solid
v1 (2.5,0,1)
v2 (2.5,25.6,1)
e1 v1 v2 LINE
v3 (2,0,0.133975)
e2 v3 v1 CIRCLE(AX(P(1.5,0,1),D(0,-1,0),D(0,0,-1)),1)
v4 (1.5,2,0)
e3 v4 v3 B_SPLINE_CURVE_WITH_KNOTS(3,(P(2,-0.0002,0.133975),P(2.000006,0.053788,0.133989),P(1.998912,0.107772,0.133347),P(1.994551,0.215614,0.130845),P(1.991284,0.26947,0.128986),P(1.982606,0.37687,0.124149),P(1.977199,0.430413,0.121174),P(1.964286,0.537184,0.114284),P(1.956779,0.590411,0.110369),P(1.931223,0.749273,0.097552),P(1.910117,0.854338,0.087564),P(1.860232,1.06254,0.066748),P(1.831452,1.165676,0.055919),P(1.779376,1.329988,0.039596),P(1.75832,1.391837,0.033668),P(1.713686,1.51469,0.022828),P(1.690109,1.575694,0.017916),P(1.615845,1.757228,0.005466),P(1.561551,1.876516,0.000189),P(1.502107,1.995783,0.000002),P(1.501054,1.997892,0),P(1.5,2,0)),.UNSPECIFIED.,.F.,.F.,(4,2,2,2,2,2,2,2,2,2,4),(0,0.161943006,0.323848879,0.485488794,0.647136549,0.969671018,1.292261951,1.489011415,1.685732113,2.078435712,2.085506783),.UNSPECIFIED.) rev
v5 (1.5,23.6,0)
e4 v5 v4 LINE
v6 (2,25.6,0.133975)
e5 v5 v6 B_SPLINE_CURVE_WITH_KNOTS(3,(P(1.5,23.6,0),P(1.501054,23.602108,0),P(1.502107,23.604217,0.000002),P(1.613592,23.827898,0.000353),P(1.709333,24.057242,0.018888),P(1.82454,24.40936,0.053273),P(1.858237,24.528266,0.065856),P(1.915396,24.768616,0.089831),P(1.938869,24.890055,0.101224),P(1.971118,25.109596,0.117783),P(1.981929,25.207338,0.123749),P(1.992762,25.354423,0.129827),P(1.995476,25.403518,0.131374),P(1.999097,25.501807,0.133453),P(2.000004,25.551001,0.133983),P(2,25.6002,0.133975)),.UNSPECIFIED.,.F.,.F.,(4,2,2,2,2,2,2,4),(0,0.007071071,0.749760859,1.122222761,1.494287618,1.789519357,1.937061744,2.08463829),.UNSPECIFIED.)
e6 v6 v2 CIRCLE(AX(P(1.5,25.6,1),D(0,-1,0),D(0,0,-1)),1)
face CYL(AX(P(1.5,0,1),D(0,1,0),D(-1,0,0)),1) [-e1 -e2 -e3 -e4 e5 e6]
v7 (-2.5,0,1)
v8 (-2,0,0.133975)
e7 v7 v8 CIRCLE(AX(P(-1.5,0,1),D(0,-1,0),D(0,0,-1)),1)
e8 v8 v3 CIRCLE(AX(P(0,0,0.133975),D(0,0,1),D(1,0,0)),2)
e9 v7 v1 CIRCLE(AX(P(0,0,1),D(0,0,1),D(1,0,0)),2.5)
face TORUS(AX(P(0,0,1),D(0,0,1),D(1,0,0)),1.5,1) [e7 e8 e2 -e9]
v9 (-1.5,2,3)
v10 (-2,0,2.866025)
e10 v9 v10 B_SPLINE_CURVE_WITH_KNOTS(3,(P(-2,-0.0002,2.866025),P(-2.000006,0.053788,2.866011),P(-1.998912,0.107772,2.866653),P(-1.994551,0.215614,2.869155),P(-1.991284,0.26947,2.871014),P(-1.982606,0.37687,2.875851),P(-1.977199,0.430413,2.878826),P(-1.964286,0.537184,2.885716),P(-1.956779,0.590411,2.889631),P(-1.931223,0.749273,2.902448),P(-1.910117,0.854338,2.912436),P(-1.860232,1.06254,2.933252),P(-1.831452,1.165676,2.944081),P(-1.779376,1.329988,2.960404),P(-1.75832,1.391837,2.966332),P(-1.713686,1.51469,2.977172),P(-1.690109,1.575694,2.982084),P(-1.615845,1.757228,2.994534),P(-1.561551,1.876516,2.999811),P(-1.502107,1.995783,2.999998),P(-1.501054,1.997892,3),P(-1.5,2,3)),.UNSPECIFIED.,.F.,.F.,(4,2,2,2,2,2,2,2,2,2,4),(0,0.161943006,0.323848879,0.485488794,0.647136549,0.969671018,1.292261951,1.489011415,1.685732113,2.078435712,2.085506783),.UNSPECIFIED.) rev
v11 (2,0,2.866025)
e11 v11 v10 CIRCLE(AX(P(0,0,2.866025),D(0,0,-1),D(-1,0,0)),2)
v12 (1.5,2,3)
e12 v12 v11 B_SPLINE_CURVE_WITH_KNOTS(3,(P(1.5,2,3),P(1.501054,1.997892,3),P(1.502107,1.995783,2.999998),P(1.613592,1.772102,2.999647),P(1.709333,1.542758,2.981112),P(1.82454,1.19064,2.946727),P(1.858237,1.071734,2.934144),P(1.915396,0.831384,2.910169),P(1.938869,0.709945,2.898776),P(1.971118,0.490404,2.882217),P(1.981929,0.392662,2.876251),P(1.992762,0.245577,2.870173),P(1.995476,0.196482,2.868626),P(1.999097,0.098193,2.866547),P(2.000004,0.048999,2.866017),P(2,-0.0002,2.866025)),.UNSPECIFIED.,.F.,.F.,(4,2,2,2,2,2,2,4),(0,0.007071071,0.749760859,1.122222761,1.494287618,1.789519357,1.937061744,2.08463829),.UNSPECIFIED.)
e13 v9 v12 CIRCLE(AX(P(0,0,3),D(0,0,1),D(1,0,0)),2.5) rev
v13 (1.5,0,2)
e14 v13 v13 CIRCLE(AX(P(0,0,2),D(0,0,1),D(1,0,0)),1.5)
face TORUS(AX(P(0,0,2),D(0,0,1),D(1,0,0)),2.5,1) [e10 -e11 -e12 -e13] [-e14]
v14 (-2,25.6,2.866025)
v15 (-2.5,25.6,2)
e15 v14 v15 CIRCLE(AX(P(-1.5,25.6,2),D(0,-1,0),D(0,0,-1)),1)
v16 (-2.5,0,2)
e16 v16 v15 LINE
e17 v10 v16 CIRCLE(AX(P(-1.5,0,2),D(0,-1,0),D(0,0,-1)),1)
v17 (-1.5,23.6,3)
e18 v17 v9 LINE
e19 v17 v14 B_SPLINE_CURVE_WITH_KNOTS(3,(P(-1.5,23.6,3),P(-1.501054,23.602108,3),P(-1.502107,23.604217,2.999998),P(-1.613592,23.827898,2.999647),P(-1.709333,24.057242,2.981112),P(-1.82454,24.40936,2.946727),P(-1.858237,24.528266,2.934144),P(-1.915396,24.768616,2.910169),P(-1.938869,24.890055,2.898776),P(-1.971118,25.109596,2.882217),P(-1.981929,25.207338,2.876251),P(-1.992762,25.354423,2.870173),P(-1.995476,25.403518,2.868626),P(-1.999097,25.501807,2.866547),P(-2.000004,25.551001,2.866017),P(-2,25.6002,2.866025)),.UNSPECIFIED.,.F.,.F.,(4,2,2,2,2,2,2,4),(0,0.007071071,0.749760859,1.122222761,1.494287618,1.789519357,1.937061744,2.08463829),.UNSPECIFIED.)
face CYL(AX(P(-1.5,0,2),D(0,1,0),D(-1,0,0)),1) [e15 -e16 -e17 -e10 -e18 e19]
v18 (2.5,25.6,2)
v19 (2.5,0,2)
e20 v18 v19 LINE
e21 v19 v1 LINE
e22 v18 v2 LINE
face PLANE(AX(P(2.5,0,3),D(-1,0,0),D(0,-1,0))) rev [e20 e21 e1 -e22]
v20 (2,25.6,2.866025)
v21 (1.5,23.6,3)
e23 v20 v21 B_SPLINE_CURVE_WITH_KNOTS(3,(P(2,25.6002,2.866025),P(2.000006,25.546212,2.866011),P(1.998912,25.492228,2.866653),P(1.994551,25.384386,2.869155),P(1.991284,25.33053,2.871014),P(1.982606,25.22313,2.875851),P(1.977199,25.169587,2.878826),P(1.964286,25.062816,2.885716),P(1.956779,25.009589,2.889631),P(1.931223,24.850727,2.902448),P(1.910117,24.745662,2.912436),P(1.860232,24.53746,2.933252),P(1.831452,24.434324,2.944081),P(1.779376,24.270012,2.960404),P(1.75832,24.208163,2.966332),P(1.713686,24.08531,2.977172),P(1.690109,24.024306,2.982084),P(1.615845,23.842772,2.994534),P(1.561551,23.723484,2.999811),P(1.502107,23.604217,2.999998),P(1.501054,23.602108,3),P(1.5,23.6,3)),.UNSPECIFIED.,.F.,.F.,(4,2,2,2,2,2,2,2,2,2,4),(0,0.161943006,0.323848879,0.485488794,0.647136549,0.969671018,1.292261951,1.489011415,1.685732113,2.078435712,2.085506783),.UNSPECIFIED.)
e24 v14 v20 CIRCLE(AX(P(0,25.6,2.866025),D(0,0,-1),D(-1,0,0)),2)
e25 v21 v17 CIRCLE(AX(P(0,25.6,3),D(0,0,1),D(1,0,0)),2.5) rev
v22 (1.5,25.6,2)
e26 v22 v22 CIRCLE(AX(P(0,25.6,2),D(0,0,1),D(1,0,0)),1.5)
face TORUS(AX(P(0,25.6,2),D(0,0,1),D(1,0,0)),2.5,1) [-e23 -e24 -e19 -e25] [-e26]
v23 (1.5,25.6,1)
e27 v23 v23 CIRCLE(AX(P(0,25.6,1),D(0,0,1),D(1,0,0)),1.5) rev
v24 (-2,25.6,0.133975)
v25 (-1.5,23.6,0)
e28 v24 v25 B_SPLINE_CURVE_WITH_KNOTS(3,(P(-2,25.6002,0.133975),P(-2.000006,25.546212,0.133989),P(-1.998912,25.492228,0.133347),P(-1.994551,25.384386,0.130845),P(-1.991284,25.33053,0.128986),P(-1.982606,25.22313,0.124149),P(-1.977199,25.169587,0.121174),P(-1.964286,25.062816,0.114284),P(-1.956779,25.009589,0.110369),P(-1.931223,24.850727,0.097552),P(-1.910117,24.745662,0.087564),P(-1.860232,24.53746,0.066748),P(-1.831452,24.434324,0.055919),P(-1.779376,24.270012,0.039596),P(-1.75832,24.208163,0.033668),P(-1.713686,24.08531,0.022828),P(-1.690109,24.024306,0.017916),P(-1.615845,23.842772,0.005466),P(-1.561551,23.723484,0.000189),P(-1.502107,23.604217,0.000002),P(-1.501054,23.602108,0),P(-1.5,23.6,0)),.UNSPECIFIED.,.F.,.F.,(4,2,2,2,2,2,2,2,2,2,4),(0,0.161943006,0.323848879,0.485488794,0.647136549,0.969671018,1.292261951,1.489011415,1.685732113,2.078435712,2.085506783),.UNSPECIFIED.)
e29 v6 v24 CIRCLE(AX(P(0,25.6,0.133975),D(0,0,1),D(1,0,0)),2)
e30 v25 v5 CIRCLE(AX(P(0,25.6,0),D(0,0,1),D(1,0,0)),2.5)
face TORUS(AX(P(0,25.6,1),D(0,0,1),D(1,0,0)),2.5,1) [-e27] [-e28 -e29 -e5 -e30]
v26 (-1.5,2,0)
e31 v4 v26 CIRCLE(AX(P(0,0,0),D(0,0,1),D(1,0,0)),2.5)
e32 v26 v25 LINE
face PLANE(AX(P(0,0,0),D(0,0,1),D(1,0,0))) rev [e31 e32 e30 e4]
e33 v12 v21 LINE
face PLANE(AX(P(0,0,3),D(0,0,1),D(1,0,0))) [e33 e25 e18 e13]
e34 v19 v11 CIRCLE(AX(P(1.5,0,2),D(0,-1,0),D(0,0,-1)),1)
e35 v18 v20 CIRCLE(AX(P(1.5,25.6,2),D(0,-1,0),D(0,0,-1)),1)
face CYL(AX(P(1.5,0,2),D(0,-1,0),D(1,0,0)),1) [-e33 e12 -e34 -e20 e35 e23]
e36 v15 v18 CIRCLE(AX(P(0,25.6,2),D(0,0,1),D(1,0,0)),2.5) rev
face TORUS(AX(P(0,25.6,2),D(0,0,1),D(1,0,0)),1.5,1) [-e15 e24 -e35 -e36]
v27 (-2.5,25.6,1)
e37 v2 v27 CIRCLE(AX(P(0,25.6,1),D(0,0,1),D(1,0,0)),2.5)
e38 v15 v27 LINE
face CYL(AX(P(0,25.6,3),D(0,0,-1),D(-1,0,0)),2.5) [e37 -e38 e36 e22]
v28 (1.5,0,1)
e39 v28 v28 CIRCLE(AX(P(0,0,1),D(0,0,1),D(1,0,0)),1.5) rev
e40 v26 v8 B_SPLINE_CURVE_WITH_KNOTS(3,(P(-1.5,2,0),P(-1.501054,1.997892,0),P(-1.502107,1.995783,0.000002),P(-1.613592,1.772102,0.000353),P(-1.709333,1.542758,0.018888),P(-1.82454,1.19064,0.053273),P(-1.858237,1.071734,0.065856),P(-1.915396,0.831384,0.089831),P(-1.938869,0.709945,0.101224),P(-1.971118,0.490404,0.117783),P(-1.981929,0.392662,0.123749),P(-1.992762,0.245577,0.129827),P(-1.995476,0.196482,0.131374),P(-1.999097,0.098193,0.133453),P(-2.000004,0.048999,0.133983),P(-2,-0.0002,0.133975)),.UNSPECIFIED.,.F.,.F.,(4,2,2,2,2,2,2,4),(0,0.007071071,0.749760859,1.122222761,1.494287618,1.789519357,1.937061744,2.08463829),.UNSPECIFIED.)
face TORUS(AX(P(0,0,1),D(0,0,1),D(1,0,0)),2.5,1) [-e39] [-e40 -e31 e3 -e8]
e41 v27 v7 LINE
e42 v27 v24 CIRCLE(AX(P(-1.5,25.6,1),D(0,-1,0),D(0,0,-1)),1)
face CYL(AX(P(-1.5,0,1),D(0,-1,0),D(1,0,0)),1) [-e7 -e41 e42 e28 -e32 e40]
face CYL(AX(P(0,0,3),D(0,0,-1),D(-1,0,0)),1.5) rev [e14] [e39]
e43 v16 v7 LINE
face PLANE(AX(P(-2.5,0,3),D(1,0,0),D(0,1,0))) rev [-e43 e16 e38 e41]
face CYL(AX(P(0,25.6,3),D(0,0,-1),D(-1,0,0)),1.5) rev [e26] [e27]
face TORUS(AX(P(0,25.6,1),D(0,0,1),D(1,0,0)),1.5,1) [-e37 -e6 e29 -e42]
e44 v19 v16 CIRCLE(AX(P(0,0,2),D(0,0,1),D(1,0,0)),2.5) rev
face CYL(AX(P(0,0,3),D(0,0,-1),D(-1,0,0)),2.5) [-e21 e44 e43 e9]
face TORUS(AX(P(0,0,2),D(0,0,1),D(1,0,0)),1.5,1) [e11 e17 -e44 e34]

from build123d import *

# Parameters (mm, degrees)
SKETCH1_R           = 1.5
BOSS_EXTRUDE1_DEPTH = 3
FILLET2_R           = 1


with BuildPart() as part:
    # Sketch1 → Boss-Extrude1 (new body)
    with BuildSketch(Plane.XY):
        with BuildLine():
            Line((-2.5, 0), (-2.5, 25.6))
            ThreePointArc((-2.5, 25.6), (0, 28.1), (2.5, 25.6))
            Line((2.5, 25.6), (2.5, 0))
            ThreePointArc((2.5, 0), (0, -2.5), (-2.5, 0))
        make_face()
        with Locations((0, 25.6)):
            Circle(SKETCH1_R, mode=Mode.SUBTRACT)
        Circle(SKETCH1_R, mode=Mode.SUBTRACT)
    extrude(amount=BOSS_EXTRUDE1_DEPTH)

    # Fillet2
    # the kernel refuses this fillet: 1 mm, written as the material it takes off along each edge
    with BuildSketch(Plane(origin=(0, 0, 3), x_dir=(1, 0, 0), z_dir=(0, 1, 0))) as fillet2_piece_1:
        with BuildLine():
            CenterArc((2.5 - FILLET2_R, FILLET2_R), FILLET2_R, 270, 90)
            Line((2.5 - FILLET2_R, 0), (2.5, 0))
            Line((2.5, 0), (2.5, FILLET2_R))
        make_face()
    revolve(axis=Axis((0, 0, 3), (0, 0, -1)), revolution_arc=180, mode=Mode.SUBTRACT)
    with BuildSketch(Plane(origin=(0, 0, 0), x_dir=(1, 0, 0), z_dir=(0, 1, 0))) as fillet2_piece_2:
        with BuildLine():
            CenterArc((2.5 - FILLET2_R, -FILLET2_R), FILLET2_R, 0, 90)
            Line((2.5 - FILLET2_R, 0), (2.5, 0))
            Line((2.5, 0), (2.5, -FILLET2_R))
        make_face()
    revolve(axis=Axis((0, 0, 0), (0, 0, -1)), revolution_arc=180, mode=Mode.SUBTRACT)
    with BuildSketch(Plane(origin=(2.5, 25.6, 3), x_dir=(0, 0, -1), z_dir=(0, -1, 0)), Plane(origin=(-2.5, 0, 3), x_dir=(0, 0, -1), z_dir=(0, 1, 0))) as fillet2_piece_3:
        with BuildLine():
            CenterArc((FILLET2_R, -FILLET2_R), FILLET2_R, 90, 90)
            Line((0, -FILLET2_R), (0, 0))
            Line((0, 0), (FILLET2_R, 0))
        make_face()
    extrude(amount=25.6, mode=Mode.SUBTRACT)
    with BuildSketch(Plane(origin=(2.5, 25.6, 0), x_dir=(0, 0, 1), z_dir=(0, -1, 0)), Plane(origin=(-2.5, 0, 0), x_dir=(0, 0, 1), z_dir=(0, 1, 0))) as fillet2_piece_4:
        with BuildLine():
            CenterArc((FILLET2_R, FILLET2_R), FILLET2_R, 180, 90)
            Line((0, FILLET2_R), (0, 0))
            Line((0, 0), (FILLET2_R, 0))
        make_face()
    extrude(amount=25.6, mode=Mode.SUBTRACT)
    with BuildSketch(Plane(origin=(0, 25.6, 3), x_dir=(-1, 0, 0), z_dir=(0, -1, 0))) as fillet2_piece_5:
        with BuildLine():
            CenterArc((2.5 - FILLET2_R, FILLET2_R), FILLET2_R, 270, 90)
            Line((2.5 - FILLET2_R, 0), (2.5, 0))
            Line((2.5, 0), (2.5, FILLET2_R))
        make_face()
    revolve(axis=Axis((0, 25.6, 3), (0, 0, -1)), revolution_arc=180, mode=Mode.SUBTRACT)
    with BuildSketch(Plane(origin=(0, 25.6, 0), x_dir=(-1, 0, 0), z_dir=(0, -1, 0))) as fillet2_piece_6:
        with BuildLine():
            CenterArc((2.5 - FILLET2_R, -FILLET2_R), FILLET2_R, 0, 90)
            Line((2.5 - FILLET2_R, 0), (2.5, 0))
            Line((2.5, 0), (2.5, -FILLET2_R))
        make_face()
    revolve(axis=Axis((0, 25.6, 0), (0, 0, -1)), revolution_arc=180, mode=Mode.SUBTRACT)
    with BuildSketch(Plane(origin=(0, 25.6, 0), x_dir=(1, 0, 0), z_dir=(0, -1, 0))) as fillet2_piece_7:
        with BuildLine():
            CenterArc((1.5 + FILLET2_R, FILLET2_R), FILLET2_R, 180, 90)
            Line((1.5 + FILLET2_R, 0), (1.5, 0))
            Line((1.5, 0), (1.5, FILLET2_R))
        make_face()
    revolve(axis=Axis((0, 25.6, 0), (0, 0, 1)), mode=Mode.SUBTRACT)
    with BuildSketch(Plane(origin=(0, 25.6, 3), x_dir=(1, 0, 0), z_dir=(0, -1, 0))) as fillet2_piece_8:
        with BuildLine():
            CenterArc((1.5 + FILLET2_R, -FILLET2_R), FILLET2_R, 90, 90)
            Line((1.5 + FILLET2_R, 0), (1.5, 0))
            Line((1.5, 0), (1.5, -FILLET2_R))
        make_face()
    revolve(axis=Axis((0, 25.6, 3), (0, 0, 1)), mode=Mode.SUBTRACT)
    with BuildSketch(Plane(origin=(0, 0, 0), x_dir=(1, 0, 0), z_dir=(0, -1, 0))) as fillet2_piece_9:
        with BuildLine():
            CenterArc((1.5 + FILLET2_R, FILLET2_R), FILLET2_R, 180, 90)
            Line((1.5 + FILLET2_R, 0), (1.5, 0))
            Line((1.5, 0), (1.5, FILLET2_R))
        make_face()
    revolve(axis=Axis((0, 0, 0), (0, 0, 1)), mode=Mode.SUBTRACT)
    with BuildSketch(Plane(origin=(0, 0, 3), x_dir=(1, 0, 0), z_dir=(0, -1, 0))) as fillet2_piece_10:
        with BuildLine():
            CenterArc((1.5 + FILLET2_R, -FILLET2_R), FILLET2_R, 90, 90)
            Line((1.5 + FILLET2_R, 0), (1.5, 0))
            Line((1.5, 0), (1.5, -FILLET2_R))
        make_face()
    revolve(axis=Axis((0, 0, 3), (0, 0, 1)), mode=Mode.SUBTRACT)


solid = part.part
